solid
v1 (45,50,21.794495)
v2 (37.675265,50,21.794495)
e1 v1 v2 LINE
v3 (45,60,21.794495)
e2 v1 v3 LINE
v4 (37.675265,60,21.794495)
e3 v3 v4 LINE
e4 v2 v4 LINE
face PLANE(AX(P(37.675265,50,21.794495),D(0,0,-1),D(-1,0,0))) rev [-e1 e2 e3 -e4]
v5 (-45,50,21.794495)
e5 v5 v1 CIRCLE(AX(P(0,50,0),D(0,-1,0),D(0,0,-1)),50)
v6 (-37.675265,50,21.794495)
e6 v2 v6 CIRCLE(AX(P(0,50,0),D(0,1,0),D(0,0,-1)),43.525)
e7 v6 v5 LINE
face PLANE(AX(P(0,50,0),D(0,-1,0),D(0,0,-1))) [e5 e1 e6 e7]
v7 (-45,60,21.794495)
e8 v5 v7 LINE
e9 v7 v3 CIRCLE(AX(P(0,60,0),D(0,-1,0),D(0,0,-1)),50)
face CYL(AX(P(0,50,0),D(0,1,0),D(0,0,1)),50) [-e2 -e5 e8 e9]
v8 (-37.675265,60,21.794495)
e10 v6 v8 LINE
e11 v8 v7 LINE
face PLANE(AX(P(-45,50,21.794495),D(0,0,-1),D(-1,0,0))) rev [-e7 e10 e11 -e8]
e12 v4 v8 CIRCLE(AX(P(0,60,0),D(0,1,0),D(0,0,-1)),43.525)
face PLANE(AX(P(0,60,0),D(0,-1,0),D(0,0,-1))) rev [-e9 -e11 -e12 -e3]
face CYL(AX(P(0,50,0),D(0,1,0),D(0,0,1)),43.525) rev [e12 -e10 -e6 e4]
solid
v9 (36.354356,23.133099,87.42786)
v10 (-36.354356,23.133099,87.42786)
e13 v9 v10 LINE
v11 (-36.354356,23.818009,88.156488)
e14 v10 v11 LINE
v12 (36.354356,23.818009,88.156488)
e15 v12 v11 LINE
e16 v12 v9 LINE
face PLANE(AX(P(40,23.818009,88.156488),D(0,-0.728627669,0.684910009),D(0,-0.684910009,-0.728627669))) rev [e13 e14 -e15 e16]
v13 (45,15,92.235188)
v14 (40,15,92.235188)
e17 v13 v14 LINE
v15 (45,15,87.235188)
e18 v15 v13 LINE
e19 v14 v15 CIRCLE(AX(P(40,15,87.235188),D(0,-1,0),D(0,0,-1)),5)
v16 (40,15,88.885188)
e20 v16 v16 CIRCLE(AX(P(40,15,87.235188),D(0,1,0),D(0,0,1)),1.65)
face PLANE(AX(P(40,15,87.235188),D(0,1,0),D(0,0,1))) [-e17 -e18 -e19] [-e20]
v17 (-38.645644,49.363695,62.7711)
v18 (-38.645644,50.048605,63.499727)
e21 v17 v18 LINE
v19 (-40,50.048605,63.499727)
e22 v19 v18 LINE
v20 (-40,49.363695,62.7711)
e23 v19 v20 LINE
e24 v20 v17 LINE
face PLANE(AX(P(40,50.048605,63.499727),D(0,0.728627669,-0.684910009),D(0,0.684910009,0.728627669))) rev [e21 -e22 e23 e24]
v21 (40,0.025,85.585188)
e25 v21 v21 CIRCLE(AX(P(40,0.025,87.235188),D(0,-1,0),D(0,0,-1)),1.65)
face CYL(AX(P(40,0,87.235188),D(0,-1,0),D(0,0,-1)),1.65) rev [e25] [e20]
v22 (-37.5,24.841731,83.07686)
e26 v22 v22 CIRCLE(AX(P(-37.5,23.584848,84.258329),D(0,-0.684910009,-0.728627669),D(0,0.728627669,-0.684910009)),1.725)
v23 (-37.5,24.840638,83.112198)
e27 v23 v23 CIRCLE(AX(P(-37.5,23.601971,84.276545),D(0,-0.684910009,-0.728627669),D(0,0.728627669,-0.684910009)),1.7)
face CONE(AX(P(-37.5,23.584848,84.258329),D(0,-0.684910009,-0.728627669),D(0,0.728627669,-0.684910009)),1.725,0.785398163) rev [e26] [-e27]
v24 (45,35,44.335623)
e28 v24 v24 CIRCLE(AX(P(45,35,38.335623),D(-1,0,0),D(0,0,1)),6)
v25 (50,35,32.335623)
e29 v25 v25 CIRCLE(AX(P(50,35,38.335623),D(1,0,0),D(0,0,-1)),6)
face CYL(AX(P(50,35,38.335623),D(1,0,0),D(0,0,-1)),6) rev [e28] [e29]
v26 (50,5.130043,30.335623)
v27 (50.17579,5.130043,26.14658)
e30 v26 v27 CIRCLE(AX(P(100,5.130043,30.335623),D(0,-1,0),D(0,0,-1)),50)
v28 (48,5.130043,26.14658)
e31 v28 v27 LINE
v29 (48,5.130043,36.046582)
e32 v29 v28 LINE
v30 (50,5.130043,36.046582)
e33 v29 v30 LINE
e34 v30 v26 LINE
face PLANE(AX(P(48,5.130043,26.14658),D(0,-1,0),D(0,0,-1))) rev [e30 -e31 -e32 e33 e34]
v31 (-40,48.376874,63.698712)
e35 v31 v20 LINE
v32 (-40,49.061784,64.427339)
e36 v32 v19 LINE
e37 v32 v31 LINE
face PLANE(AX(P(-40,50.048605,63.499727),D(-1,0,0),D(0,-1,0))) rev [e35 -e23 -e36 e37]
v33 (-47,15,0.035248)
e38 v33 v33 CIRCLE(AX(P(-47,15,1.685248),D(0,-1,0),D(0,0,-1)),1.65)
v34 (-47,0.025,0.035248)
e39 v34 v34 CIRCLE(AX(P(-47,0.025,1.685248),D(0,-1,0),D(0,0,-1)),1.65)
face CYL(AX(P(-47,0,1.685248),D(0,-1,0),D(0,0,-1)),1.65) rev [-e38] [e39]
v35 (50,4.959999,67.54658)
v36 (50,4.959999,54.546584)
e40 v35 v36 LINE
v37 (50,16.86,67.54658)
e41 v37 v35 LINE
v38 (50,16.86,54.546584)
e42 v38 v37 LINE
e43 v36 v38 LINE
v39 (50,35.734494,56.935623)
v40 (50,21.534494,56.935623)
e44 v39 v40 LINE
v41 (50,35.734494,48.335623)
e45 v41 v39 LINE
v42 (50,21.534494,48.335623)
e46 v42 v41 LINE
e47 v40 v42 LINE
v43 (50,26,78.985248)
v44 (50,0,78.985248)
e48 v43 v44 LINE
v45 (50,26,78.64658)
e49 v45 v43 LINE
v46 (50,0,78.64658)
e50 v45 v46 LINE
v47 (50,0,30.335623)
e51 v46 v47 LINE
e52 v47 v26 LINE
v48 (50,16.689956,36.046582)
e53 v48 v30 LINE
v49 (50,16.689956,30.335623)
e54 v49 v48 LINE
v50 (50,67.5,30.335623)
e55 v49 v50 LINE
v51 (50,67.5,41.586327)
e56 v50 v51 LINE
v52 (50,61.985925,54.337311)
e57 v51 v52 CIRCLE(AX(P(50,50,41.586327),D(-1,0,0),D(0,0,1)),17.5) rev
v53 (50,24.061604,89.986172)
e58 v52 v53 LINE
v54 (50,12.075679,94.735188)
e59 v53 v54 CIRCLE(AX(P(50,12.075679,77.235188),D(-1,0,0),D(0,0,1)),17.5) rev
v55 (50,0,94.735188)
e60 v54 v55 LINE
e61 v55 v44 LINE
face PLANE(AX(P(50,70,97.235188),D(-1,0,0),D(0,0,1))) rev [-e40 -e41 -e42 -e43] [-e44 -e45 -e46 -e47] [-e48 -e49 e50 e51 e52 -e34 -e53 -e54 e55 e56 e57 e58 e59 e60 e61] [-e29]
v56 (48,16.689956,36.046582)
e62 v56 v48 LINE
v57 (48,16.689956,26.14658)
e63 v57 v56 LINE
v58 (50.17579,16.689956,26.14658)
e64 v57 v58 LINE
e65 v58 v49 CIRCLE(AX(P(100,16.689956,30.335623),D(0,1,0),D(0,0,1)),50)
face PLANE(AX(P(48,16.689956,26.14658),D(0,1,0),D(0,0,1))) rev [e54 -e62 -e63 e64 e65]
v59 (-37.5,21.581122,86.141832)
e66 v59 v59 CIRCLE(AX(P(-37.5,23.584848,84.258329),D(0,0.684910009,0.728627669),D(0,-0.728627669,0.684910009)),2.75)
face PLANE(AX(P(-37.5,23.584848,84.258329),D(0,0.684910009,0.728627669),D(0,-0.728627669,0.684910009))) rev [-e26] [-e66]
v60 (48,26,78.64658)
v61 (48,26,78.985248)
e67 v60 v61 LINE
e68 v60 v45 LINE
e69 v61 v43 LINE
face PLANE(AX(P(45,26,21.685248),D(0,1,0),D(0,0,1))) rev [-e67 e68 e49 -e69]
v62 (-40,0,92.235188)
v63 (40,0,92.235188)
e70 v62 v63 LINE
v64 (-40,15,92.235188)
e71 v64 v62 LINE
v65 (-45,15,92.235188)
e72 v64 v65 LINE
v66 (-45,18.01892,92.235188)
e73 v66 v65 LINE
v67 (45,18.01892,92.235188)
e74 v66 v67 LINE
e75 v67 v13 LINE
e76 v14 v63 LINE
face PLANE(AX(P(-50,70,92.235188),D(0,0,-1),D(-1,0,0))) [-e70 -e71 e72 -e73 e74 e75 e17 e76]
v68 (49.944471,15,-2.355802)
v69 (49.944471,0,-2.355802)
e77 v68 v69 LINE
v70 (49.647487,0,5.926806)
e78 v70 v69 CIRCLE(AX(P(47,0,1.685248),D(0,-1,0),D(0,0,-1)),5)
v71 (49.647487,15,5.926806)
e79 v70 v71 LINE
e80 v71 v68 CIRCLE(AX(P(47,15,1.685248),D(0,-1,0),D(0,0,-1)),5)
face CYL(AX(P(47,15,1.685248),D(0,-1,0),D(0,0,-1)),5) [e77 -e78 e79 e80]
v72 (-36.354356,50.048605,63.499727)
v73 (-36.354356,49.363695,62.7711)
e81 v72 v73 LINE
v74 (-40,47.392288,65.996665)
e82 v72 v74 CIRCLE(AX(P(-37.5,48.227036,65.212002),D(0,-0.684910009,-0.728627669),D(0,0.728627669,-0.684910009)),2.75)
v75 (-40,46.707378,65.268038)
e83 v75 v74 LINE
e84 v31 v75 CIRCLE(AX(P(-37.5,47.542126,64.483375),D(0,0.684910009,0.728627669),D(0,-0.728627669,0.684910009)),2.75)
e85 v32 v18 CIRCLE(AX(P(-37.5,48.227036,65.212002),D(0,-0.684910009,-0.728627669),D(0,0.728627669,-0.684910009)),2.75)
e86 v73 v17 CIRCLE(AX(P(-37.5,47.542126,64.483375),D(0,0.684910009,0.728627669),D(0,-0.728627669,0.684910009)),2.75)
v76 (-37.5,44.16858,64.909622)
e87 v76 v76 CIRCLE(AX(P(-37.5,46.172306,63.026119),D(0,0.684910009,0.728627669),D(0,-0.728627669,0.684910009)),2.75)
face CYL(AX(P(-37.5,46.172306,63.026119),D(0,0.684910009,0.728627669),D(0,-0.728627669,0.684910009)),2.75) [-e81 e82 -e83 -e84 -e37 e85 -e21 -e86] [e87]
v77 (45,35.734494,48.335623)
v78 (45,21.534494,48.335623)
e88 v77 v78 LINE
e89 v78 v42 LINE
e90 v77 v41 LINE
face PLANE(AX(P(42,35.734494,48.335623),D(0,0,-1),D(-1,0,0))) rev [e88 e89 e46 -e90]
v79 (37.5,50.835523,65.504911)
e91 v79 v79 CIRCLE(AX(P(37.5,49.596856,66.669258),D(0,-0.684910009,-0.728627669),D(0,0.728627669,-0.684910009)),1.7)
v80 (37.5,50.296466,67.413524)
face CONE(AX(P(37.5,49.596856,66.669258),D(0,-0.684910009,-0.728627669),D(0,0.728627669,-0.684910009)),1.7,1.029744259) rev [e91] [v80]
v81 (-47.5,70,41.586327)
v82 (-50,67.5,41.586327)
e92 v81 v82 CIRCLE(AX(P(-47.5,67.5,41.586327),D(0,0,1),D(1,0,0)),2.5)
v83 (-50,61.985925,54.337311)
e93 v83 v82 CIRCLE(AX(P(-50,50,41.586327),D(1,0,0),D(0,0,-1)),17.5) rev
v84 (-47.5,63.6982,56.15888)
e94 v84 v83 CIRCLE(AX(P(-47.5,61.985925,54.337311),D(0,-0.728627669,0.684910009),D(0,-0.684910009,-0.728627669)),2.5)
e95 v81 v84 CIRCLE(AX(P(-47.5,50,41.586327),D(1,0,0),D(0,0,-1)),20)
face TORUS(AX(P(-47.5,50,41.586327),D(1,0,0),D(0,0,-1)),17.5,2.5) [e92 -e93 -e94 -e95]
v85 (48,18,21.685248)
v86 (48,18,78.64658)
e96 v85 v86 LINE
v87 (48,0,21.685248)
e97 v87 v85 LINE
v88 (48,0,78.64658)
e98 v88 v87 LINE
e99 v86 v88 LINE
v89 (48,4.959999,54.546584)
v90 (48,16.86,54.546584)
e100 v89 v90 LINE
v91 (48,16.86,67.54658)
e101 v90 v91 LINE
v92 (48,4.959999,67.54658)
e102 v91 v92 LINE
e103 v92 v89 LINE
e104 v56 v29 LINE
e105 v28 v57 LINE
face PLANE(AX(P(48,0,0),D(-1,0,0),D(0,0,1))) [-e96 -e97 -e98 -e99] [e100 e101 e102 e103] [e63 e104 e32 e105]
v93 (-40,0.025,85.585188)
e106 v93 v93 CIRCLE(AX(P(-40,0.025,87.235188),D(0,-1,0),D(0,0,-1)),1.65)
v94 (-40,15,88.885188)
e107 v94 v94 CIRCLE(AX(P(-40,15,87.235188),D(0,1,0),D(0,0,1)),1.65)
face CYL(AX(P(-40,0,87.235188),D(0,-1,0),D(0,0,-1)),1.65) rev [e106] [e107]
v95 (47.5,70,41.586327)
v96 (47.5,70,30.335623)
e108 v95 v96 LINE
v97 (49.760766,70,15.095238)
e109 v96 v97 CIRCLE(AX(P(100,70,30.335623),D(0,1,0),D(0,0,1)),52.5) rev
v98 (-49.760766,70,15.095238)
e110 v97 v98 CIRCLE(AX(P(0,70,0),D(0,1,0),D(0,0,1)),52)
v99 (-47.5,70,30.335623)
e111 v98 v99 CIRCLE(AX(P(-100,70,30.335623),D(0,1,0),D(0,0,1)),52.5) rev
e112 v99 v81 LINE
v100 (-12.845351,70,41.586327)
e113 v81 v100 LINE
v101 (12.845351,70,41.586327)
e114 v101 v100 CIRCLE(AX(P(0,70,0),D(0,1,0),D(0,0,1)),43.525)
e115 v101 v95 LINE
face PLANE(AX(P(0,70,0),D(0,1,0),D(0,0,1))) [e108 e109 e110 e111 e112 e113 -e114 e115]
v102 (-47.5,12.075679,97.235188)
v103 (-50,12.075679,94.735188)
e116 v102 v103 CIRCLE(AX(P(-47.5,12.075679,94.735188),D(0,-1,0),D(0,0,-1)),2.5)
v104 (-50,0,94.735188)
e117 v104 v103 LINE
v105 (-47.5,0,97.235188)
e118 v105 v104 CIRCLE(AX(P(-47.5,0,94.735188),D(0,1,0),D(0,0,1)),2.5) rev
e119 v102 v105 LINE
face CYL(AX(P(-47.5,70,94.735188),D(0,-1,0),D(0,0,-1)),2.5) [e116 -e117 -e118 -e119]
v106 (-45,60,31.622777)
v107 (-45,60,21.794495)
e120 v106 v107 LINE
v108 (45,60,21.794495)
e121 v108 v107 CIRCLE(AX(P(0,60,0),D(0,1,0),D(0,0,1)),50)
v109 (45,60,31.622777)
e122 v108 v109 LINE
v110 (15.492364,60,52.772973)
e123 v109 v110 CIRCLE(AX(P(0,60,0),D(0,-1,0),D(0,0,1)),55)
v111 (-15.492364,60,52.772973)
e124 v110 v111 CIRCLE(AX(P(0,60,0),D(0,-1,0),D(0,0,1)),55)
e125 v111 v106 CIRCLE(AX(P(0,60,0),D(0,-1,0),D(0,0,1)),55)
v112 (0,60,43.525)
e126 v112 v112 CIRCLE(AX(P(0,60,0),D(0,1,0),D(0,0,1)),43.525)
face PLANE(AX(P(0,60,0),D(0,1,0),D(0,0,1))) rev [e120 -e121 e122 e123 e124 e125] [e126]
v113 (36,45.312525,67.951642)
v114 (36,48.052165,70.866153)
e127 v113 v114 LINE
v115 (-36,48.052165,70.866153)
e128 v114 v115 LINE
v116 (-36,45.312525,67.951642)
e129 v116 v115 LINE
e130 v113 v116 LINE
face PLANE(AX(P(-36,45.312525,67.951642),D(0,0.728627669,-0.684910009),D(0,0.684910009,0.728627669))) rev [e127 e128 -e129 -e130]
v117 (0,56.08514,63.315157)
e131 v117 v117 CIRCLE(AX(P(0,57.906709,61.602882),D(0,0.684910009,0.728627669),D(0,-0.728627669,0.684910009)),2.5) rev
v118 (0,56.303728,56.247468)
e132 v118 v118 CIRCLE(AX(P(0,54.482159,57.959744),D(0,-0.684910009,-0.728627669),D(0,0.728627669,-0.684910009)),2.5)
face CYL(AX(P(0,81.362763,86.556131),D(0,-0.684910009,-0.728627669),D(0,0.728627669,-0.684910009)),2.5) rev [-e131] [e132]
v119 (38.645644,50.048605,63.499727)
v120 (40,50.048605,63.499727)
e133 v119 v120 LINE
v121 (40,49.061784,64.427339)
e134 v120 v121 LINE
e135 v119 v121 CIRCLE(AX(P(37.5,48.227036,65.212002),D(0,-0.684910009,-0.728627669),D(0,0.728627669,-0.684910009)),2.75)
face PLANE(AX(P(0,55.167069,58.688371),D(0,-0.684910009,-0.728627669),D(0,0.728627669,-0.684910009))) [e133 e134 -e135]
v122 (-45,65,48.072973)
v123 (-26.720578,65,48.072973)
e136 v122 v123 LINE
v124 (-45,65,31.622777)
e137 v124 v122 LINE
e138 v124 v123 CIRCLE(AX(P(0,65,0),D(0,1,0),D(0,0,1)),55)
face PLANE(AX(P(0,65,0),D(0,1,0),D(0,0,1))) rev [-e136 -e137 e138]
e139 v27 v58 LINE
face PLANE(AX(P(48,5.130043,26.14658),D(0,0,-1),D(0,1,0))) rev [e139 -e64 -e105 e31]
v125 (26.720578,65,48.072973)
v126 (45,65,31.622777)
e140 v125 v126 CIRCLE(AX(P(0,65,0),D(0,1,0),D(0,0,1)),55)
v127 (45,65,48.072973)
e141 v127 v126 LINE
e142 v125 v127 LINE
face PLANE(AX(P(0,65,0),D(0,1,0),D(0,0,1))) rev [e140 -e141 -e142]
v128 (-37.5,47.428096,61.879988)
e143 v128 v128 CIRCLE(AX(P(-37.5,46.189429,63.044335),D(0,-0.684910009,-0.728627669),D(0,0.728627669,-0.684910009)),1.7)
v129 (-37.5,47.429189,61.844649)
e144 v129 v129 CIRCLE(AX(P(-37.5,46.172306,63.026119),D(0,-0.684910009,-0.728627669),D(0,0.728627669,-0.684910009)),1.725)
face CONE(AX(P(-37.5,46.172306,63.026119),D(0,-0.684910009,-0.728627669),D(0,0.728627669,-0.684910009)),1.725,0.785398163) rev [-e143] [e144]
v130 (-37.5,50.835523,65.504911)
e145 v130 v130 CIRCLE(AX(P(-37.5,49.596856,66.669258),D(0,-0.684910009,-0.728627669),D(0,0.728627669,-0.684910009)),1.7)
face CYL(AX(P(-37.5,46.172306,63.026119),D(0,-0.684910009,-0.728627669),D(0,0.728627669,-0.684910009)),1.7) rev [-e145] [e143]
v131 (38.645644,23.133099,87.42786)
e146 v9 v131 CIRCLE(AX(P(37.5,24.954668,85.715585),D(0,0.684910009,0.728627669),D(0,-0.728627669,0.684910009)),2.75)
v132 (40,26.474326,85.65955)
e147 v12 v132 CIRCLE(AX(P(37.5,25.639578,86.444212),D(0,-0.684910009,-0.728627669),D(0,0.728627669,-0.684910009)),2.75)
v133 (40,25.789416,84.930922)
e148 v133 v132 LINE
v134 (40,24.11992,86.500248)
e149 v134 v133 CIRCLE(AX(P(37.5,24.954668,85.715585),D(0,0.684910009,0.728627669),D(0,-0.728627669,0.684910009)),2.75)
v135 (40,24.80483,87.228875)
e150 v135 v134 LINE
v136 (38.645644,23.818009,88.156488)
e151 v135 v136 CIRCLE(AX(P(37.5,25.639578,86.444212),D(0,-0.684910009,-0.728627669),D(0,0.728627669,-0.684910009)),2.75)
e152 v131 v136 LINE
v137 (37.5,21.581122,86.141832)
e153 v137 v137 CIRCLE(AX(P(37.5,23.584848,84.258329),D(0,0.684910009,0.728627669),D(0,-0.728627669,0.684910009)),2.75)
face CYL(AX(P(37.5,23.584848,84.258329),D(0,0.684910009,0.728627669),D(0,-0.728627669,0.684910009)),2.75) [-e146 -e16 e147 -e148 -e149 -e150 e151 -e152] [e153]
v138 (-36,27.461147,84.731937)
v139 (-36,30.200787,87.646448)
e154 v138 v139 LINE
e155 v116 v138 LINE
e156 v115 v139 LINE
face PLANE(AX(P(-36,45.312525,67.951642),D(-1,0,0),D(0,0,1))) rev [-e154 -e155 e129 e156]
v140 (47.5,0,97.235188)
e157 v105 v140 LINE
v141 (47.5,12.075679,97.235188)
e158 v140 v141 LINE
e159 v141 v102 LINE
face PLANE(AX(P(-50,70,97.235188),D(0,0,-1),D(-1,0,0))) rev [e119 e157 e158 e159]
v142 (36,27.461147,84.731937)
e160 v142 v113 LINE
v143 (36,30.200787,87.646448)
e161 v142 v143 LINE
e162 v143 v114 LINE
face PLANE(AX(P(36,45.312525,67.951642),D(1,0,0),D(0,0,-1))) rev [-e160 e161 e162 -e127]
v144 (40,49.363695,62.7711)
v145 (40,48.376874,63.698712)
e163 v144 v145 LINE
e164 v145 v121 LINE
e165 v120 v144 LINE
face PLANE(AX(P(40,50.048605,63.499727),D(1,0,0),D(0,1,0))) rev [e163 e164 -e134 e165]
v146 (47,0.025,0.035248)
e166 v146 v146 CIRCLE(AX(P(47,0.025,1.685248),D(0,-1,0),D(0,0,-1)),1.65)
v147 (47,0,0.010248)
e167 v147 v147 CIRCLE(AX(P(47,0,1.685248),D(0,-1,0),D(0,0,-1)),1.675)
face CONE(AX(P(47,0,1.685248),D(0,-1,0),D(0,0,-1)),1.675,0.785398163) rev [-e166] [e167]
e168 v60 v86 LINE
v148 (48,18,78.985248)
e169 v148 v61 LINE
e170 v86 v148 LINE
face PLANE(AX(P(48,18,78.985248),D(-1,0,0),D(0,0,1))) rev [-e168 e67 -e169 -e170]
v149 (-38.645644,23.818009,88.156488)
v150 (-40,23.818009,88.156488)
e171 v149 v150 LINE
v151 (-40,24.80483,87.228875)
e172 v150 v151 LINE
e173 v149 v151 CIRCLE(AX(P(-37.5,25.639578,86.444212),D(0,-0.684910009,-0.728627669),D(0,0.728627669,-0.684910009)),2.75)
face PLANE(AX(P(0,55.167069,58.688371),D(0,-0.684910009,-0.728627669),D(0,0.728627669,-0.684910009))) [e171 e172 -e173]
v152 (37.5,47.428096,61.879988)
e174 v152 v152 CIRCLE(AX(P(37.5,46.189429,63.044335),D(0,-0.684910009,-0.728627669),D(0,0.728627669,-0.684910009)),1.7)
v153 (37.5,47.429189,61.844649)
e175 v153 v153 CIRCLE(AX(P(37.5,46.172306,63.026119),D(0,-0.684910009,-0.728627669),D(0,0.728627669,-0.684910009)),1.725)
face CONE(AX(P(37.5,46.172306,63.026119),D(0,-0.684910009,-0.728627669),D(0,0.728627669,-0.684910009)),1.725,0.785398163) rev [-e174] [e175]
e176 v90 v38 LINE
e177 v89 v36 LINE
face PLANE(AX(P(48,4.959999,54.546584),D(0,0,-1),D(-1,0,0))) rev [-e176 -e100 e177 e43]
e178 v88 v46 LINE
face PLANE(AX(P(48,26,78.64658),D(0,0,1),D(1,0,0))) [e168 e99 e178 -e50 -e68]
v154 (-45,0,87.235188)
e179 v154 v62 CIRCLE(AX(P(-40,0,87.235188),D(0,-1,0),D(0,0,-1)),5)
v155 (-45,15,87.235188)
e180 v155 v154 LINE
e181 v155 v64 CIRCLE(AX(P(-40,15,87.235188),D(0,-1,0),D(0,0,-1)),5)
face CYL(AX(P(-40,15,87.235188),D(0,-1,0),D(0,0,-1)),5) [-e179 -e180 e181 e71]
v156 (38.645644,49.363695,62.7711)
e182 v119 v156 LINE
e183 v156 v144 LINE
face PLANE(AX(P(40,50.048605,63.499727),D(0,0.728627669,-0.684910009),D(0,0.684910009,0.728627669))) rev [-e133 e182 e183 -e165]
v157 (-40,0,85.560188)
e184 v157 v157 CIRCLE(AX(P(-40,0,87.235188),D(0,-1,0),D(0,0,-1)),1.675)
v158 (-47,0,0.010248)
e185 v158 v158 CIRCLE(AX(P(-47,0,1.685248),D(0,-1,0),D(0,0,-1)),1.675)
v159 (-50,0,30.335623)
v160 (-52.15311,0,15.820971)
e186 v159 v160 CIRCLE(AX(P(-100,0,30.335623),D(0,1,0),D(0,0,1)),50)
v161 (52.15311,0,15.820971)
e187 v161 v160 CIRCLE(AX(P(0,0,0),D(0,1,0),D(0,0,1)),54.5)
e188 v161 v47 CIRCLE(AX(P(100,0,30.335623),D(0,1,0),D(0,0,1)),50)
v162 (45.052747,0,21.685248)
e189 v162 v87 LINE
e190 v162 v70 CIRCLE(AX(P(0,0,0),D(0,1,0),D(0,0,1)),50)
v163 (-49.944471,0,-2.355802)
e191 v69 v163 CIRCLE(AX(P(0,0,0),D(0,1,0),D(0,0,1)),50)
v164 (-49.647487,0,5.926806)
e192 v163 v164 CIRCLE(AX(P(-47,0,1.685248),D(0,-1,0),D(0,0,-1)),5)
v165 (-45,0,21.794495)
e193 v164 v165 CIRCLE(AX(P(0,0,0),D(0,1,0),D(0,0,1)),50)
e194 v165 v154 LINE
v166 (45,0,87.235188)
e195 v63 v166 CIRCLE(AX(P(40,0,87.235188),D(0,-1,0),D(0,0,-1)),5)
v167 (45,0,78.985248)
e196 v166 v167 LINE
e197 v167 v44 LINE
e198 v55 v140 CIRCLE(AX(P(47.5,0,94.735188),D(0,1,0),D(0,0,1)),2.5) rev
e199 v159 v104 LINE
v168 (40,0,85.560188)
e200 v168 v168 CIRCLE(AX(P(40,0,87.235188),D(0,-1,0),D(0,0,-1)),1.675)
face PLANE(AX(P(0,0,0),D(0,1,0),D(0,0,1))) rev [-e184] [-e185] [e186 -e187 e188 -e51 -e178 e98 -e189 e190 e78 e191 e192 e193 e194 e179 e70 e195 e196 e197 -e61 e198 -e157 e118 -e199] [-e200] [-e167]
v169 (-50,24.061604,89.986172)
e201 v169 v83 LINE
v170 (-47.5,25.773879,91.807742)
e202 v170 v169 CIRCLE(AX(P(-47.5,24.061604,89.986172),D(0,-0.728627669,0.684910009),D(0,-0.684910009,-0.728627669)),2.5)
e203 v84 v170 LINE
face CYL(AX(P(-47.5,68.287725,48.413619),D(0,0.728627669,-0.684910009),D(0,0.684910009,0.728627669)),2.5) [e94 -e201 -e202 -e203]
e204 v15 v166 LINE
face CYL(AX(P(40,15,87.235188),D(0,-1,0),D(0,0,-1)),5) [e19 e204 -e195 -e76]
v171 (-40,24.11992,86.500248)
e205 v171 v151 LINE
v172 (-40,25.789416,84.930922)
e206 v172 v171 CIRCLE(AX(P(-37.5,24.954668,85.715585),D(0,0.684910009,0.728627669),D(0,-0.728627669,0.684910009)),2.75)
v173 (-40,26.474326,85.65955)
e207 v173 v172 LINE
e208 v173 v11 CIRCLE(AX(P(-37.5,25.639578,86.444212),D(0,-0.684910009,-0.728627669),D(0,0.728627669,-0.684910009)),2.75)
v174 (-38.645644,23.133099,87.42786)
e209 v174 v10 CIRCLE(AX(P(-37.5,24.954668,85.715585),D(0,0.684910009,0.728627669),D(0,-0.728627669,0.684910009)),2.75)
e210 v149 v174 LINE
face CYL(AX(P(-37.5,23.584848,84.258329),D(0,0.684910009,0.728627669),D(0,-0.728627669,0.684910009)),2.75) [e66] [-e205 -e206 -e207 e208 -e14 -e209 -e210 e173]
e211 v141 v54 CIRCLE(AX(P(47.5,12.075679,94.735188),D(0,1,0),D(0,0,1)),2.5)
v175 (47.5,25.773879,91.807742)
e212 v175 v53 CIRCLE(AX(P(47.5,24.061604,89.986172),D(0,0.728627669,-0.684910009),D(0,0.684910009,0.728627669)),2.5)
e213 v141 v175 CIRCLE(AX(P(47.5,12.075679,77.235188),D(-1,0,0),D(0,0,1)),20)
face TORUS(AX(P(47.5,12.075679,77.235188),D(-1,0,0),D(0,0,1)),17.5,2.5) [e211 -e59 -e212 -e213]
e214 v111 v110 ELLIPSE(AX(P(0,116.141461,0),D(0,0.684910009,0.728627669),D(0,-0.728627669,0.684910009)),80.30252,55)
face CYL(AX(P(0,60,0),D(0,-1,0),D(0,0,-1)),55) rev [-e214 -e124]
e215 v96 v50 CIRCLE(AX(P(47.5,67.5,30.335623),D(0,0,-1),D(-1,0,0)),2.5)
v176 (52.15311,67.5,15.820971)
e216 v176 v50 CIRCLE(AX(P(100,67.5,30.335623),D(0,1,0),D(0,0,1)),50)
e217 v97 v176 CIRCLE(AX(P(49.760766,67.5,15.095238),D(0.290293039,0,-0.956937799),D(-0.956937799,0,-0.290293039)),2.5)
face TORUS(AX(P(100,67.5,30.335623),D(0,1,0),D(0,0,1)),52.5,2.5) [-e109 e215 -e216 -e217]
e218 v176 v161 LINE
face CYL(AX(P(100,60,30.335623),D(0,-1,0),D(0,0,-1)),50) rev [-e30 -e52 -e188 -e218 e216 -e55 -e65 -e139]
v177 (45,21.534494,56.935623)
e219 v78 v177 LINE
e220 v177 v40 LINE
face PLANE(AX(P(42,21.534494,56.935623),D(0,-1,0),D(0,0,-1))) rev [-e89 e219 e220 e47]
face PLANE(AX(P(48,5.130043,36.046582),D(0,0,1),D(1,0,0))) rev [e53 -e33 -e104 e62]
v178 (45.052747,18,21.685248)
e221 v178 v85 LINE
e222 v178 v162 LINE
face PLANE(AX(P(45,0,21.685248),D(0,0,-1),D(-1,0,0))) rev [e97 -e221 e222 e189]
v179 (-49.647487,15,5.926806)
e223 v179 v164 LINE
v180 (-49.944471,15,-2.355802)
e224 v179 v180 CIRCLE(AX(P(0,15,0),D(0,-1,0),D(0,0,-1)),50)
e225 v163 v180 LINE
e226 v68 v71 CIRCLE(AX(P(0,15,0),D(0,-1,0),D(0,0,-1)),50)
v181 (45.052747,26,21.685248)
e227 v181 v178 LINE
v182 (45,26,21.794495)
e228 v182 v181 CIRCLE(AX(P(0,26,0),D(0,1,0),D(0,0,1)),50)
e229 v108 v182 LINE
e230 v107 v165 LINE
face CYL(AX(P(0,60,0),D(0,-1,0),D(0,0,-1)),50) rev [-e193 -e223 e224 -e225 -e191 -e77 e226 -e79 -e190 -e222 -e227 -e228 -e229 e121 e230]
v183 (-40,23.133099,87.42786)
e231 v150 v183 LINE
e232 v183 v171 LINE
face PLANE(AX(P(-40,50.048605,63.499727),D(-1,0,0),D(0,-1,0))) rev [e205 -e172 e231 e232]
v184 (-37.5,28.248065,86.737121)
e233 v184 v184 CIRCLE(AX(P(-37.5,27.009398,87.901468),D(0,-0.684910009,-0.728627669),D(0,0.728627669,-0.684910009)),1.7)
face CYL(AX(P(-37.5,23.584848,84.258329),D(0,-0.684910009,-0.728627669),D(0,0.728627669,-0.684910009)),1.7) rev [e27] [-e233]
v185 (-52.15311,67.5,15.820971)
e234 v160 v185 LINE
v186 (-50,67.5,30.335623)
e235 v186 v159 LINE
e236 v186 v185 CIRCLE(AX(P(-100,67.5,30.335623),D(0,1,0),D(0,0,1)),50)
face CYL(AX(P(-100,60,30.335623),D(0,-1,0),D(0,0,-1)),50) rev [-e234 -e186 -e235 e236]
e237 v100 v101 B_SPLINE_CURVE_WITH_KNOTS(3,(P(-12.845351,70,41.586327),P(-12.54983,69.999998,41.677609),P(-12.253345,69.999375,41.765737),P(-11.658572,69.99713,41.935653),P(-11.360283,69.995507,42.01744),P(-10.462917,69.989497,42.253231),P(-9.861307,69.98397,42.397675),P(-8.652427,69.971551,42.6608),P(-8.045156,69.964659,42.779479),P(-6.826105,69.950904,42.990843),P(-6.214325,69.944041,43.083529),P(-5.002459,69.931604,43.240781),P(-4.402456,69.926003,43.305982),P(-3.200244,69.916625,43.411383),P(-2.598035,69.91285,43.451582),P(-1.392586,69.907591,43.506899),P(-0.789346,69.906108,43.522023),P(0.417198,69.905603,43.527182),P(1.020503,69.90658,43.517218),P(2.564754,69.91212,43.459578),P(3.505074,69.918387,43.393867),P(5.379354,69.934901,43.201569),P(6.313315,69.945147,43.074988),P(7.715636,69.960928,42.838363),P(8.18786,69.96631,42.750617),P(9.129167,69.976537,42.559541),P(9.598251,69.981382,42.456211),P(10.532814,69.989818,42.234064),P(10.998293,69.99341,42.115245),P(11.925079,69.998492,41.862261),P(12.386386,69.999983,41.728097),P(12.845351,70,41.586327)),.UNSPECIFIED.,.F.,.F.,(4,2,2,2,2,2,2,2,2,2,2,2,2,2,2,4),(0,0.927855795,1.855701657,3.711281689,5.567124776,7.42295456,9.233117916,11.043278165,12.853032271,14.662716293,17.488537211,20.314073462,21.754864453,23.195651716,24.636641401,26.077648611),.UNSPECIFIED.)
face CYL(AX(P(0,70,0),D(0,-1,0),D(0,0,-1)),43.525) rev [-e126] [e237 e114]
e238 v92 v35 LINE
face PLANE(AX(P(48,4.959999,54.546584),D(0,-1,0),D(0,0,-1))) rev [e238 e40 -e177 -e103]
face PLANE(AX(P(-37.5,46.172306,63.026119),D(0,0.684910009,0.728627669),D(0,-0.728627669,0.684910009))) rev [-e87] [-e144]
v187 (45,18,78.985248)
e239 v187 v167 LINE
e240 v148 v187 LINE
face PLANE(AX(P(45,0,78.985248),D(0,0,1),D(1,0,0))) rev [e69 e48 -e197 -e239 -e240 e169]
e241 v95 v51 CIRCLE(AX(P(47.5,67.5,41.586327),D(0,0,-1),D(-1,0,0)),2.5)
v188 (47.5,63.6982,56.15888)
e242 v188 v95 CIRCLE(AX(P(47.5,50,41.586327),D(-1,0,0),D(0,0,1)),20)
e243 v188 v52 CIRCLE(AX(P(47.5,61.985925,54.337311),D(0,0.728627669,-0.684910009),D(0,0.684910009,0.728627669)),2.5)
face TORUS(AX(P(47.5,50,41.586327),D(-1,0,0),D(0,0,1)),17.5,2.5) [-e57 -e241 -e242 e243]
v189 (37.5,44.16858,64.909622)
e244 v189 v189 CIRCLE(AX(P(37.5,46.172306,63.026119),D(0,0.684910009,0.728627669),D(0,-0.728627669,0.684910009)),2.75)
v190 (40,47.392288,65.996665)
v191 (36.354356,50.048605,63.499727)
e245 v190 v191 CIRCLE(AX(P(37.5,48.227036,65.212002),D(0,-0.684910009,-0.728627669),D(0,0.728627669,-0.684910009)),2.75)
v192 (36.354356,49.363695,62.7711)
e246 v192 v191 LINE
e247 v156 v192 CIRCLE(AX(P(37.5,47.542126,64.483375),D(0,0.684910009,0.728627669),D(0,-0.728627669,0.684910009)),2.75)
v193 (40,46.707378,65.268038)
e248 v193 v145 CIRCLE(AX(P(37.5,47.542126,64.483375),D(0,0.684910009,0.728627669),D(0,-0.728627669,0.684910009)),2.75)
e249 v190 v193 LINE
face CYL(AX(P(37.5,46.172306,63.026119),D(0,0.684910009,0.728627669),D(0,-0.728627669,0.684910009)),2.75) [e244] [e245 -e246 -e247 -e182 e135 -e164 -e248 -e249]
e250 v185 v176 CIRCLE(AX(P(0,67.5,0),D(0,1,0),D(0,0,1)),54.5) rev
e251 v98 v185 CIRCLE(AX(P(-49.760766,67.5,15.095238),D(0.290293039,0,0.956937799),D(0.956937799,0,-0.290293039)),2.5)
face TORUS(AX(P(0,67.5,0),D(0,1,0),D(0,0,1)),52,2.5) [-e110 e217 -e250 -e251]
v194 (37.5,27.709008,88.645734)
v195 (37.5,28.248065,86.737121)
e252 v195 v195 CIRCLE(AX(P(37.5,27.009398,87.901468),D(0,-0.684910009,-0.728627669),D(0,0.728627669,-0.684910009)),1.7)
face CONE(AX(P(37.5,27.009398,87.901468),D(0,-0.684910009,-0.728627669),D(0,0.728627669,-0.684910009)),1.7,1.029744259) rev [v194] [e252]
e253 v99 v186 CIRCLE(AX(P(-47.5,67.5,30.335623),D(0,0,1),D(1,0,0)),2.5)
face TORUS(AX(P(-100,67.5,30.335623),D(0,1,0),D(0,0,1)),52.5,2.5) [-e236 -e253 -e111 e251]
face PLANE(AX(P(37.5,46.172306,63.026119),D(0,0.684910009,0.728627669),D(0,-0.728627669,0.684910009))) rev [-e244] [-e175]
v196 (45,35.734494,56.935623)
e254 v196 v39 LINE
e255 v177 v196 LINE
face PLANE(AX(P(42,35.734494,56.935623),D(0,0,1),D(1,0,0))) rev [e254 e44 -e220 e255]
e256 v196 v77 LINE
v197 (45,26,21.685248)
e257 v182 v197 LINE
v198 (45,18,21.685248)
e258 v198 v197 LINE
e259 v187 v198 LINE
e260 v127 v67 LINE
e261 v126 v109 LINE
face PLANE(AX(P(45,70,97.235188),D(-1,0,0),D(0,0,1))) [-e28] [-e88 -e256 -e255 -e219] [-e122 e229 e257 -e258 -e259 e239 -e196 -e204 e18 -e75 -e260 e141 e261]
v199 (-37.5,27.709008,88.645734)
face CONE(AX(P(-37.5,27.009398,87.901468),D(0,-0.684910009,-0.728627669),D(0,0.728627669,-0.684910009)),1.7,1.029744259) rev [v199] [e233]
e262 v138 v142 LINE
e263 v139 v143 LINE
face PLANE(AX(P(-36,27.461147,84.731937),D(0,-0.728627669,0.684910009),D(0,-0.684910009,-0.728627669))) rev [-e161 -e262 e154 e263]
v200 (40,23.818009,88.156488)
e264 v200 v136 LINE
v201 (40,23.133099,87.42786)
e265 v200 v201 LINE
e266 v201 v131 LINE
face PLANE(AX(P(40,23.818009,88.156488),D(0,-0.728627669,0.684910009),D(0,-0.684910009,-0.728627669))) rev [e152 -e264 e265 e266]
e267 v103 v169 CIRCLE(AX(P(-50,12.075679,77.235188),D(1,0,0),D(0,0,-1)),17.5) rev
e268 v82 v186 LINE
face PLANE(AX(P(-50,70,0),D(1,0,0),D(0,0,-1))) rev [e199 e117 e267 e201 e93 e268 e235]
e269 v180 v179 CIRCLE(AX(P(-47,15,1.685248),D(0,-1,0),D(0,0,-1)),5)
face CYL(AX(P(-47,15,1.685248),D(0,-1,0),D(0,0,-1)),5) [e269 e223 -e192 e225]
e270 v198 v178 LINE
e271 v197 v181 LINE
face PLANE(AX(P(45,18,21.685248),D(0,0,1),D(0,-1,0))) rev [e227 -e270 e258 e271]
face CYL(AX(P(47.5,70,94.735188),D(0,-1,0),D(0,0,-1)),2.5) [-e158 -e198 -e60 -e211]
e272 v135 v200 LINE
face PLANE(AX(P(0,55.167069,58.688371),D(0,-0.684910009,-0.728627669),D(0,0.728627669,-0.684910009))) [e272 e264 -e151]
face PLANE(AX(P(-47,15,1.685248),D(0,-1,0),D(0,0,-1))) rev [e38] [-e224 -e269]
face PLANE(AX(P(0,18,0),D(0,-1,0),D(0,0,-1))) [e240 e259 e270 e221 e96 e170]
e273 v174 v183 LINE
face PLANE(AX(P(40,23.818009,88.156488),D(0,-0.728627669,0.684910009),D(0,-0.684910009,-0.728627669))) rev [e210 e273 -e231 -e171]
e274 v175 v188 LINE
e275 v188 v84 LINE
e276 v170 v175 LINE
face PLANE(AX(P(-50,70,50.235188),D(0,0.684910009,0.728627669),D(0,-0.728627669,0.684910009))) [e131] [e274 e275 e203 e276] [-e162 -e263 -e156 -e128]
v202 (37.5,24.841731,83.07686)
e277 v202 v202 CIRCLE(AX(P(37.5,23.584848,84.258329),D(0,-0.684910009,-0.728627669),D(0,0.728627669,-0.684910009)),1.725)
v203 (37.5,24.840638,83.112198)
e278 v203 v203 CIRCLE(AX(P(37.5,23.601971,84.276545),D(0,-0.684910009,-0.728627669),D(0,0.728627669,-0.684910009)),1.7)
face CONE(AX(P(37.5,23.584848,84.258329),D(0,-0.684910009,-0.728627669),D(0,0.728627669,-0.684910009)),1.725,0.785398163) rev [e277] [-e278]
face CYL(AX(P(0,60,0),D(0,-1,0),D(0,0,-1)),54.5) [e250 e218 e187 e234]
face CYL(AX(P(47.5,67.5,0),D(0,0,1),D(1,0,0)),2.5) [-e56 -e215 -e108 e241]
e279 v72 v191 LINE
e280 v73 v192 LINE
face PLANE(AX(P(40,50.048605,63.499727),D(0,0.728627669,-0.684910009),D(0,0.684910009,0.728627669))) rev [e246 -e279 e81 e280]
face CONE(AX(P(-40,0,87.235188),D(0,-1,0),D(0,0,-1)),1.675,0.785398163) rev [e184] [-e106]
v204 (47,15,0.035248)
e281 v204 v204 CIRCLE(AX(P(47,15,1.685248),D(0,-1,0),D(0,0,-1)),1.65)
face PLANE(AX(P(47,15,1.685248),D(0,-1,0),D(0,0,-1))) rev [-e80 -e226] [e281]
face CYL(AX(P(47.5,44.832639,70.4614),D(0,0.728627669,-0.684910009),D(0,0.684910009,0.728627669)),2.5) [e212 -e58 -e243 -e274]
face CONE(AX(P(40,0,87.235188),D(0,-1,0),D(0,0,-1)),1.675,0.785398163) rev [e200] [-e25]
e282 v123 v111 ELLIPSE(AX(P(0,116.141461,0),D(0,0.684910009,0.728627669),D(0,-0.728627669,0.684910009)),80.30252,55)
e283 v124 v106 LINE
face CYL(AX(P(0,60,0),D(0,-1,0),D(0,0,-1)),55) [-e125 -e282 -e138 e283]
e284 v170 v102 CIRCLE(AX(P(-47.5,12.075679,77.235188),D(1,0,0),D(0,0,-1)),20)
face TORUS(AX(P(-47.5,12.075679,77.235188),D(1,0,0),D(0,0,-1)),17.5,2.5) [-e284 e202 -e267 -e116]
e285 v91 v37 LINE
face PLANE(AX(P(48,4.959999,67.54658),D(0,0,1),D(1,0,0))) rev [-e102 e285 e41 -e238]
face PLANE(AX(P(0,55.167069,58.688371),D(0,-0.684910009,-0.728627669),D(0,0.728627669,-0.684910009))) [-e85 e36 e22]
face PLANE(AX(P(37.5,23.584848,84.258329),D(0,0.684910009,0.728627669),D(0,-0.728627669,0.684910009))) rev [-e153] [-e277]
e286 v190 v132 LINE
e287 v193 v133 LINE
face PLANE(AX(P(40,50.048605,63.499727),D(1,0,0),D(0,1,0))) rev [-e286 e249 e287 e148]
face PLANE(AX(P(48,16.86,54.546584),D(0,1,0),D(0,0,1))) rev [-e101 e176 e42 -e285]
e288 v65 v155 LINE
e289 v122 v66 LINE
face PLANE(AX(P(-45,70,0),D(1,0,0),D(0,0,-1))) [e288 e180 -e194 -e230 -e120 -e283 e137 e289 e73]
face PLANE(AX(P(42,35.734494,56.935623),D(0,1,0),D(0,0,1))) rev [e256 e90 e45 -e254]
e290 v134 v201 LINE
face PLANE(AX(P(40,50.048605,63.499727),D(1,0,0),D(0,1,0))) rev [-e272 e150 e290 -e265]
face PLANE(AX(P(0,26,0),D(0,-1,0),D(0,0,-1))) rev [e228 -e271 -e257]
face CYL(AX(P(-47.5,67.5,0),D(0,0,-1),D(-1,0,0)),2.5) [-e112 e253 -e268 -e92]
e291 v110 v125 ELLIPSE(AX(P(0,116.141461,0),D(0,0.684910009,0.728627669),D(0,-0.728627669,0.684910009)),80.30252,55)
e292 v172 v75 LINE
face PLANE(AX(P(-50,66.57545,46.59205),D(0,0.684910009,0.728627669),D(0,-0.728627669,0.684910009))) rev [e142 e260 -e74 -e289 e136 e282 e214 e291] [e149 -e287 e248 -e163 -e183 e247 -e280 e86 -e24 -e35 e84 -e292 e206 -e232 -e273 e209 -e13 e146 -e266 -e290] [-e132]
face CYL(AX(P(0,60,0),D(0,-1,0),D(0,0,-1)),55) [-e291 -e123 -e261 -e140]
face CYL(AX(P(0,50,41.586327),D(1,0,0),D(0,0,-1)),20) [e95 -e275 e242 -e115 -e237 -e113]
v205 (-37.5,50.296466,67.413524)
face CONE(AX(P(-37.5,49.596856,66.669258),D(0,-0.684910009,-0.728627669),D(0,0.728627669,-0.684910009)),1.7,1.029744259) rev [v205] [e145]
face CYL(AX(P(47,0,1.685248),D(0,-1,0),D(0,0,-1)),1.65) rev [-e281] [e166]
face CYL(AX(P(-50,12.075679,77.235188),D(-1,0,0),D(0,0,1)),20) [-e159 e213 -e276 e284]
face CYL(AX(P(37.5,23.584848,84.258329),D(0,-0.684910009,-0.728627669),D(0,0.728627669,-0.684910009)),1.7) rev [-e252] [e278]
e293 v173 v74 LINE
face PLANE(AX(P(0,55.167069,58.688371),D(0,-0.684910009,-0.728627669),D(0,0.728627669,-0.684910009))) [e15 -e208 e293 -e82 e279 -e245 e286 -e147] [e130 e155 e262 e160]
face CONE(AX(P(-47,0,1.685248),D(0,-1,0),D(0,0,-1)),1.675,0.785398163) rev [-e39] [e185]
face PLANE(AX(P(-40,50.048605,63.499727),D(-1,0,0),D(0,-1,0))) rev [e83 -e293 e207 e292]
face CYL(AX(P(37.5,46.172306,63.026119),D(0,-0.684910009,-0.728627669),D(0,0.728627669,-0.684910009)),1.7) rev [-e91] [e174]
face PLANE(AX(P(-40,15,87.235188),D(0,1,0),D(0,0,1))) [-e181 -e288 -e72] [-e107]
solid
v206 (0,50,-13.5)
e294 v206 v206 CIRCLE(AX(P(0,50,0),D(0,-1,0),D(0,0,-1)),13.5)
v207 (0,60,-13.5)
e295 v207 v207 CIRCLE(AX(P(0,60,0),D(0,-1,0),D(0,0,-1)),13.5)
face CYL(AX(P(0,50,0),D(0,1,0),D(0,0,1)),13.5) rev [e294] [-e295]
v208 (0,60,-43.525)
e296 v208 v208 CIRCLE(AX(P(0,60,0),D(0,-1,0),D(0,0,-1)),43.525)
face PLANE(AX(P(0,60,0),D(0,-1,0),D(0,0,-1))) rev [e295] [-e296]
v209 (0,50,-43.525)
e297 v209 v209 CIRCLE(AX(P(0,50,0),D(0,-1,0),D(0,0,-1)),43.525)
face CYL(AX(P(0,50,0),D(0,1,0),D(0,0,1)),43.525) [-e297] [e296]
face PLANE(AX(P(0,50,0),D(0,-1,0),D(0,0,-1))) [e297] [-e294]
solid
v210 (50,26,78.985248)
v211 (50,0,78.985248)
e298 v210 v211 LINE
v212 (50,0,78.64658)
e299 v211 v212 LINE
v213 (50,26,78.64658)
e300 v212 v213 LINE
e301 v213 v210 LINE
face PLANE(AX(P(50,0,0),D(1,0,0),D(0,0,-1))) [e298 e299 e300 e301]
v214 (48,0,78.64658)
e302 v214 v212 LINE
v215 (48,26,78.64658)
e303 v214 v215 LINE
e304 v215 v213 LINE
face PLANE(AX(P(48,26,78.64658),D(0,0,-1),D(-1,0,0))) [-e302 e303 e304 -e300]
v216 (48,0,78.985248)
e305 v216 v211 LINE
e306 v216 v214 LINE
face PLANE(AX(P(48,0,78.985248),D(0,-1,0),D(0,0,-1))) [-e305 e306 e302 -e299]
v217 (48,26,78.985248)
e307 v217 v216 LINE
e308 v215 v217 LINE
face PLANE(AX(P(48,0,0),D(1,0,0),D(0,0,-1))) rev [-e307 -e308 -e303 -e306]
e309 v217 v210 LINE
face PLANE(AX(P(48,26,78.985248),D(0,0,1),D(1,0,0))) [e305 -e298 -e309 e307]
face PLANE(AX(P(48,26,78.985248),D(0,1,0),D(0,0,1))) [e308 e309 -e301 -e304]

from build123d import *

# Parameters (mm, degrees)
SKETCH1_R                             = 54.5
SKETCH1_R_2                           = 50
BOSS_EXTRUDE1_DEPTH                   = 60
SKETCH2_R                             = 54.5
SKETCH2_R_2                           = 43.525
BOSS_EXTRUDE2_DEPTH                   = 10
BOSS_EXTRUDE4_DEPTH                   = 70
CUT_EXTRUDE3_DEPTH                    = 100
SHELL1_DEPTH                          = 65
SHELL1_START                          = 79.546448744
SHELL1_2_OUTLINE_W                    = 92
SHELL1_2_OUTLINE_H                    = 68
SHELL1_2_DEPTH                        = 5
CUT_EXTRUDE4_DEPTH                    = 60
SKETCH12_W                            = 72
SKETCH12_H                            = 24.5
CUT_EXTRUDE5_DEPTH                    = 4
SKETCH13_W                            = 80
SKETCH13_H                            = 36
CUT_EXTRUDE6_DEPTH                    = 1
SKETCH15_R                            = 2.75
BOSS_EXTRUDE5_DEPTH                   = 7
M3_CLEARANCE_HOLE1_D                  = 3.4
M3_CLEARANCE_HOLE1_DEPTH              = 5
M3_CLEARANCE_HOLE1_CSINK_D            = 3.45
M3_CLEARANCE_HOLE1_CSINK_ANGLE        = 90
M3_CLEARANCE_HOLE1_TIP                = 1.021463052
SKETCH19_R                            = 5
BOSS_EXTRUDE6_DEPTH                   = 15
BOSS_EXTRUDE6_2_DEPTH                 = 15
BOSS_EXTRUDE7_DEPTH                   = 15
SKETCH21_R                            = 5
BOSS_EXTRUDE8_DEPTH                   = 15
TAP_DRILL_FOR_M4X0_7_TAP1_D           = 3.3
TAP_DRILL_FOR_M4X0_7_TAP1_DEPTH       = 15
TAP_DRILL_FOR_M4X0_7_TAP1_CSINK_D     = 3.35
TAP_DRILL_FOR_M4X0_7_TAP1_CSINK_ANGLE = 90
SKETCH24_W                            = 57.3
SKETCH24_H                            = 26
CUT_EXTRUDE7_DEPTH                    = 5
SKETCH25_W                            = 57.3
SKETCH25_H                            = 26
SKETCH25_W_2                          = 12.999996543
SKETCH25_H_2                          = 11.900000274
SKETCH25_W_3                          = 9.900001809
SKETCH25_H_3                          = 11.55991244
BOSS_EXTRUDE9_DEPTH                   = 2
SKETCH26_W                            = 0.338668116
SKETCH26_H                            = 26
BOSS_EXTRUDE10_DEPTH                  = 2
FILLET1_R                             = 50
FILLET2_R                             = 20
FILLET3_R                             = 20
FILLET4_R                             = 2.5
SKETCH27_R                            = 2.5
CUT_EXTRUDE8_DEPTH                    = 5
SKETCH30_W                            = 6
SKETCH30_H                            = 5.001
SKETCH31_R                            = 43.525
SKETCH31_R_2                          = 13.5
BOSS_EXTRUDE11_DEPTH                  = 10
BOSS_EXTRUDE16_DEPTH                  = 10
SKETCH36_W                            = 3
SKETCH36_H                            = 57.3
BOSS_EXTRUDE17_DEPTH                  = 8
SKETCH33_W                            = 8.6
SKETCH33_H                            = 14.2
CUT_EXTRUDE10_DEPTH                   = 8


with BuildPart() as part:
    # Sketch1 → Boss-Extrude1 (new body)
    with BuildSketch(Plane(origin=(0, 0, 0), x_dir=(1, 0, 0), z_dir=(0, 1, 0))):
        with Locations(Location((0, 0, 0), (0, 0, 270))):
            Circle(SKETCH1_R)
        with Locations(Location((0, 0, 0), (0, 0, 270))):
            Circle(SKETCH1_R_2, mode=Mode.SUBTRACT)
    extrude(amount=BOSS_EXTRUDE1_DEPTH)

    # Sketch2 → Boss-Extrude2 (add)
    with BuildSketch(Plane(origin=(0, 60, 0), x_dir=(1, 0, 0), z_dir=(0, 1, 0))):
        with Locations(Location((0, 0, 0), (0, 0, 270))):
            Circle(SKETCH2_R)
        with Locations(Location((0, 0, 0), (0, 0, 270))):
            Circle(SKETCH2_R_2, mode=Mode.SUBTRACT)
    extrude(amount=BOSS_EXTRUDE2_DEPTH)

    # Sketch3 → Boss-Extrude4 (add)
    with BuildSketch(Plane.XZ):
        with BuildLine():
            Line((-50, 0), (-50, 97.235188276))
            Line((-50, 97.235188276), (50, 97.235188276))
            Line((50, 97.235188276), (50, 0))
            ThreePointArc((50, 0), (0, 50), (-50, 0))
        make_face()
    extrude(amount=-BOSS_EXTRUDE4_DEPTH)

    # Sketch4 → Cut-Extrude3 (cut)
    with BuildSketch(Plane(origin=(50, 0, 0), x_dir=(0, 0, -1), z_dir=(1, 0, 0))):
        Polygon((-97.235188276, 70), (-97.235188276, 20), (-50.235188276, 70), align=None)
    extrude(amount=-CUT_EXTRUDE3_DEPTH, mode=Mode.SUBTRACT)

    # Shell1: read off the stored shape, not the designer's step
    # Shell1 outline → Shell1 (cut)
    with BuildSketch(Plane(origin=(0, 0, 0), x_dir=(1, 0, 0), z_dir=(0, 1, 0))):
        with BuildLine():
            Line((45, -92.235188276), (45, -31.622776602))
            ThreePointArc((45, -31.622776602), (0, -55), (-45, -31.622776602))
            Line((-45, -31.622776602), (-45, -92.235188276))
            Line((-45, -92.235188276), (45, -92.235188276))
        make_face()
    extrude(amount=SHELL1_DEPTH, mode=Mode.SUBTRACT)

    # Shell1 2 outline → Shell1 2 (add)
    with BuildSketch(Plane(origin=(0, 0, 0), x_dir=(1, 0, 0), z_dir=(0, 0.6849100087678871, 0.7286276689020071)).offset(SHELL1_START)):
        with Locations((0, -18)):
            Rectangle(SHELL1_2_OUTLINE_W, SHELL1_2_OUTLINE_H)
    extrude(amount=SHELL1_2_DEPTH)

    # Sketch5 → Cut-Extrude4 (cut)
    with BuildSketch(Plane.XZ):
        with BuildLine():
            Line((-45, 31.622776602), (-45, 21.794494718))
            ThreePointArc((-45, 21.794494718), (0, 50), (45, 21.794494718))
            Line((45, 21.794494718), (45, 31.622776602))
            ThreePointArc((45, 31.622776602), (0, 55), (-45, 31.622776602))
        make_face()
    extrude(amount=-CUT_EXTRUDE4_DEPTH, mode=Mode.SUBTRACT)

    # Sketch12 → Cut-Extrude5 (cut)
    with BuildSketch(Plane(origin=(0, 57.906708951, 61.602881862), x_dir=(1, 0, 0), z_dir=(0, 0.6849100087678871, 0.7286276689020071))):
        with Locations((0, -25.774800277)):
            Rectangle(SKETCH12_W, SKETCH12_H)
    extrude(amount=-CUT_EXTRUDE5_DEPTH, mode=Mode.SUBTRACT)

    # Sketch13 → Cut-Extrude6 (cut)
    with BuildSketch(Plane(origin=(0, 54.482158907, 57.959743518), x_dir=(-1, 0, 0), z_dir=(0, -0.6849100087678871, -0.7286276689020071))):
        with Locations((0, -25.024800277)):
            Rectangle(SKETCH13_W, SKETCH13_H)
    extrude(amount=-CUT_EXTRUDE6_DEPTH, mode=Mode.SUBTRACT)

    # Sketch15 → Boss-Extrude5 (add)
    with BuildSketch(Plane(origin=(0, 57.906708951, 61.602881862), x_dir=(1, 0, 0), z_dir=(0, 0.6849100087678871, 0.7286276689020071))):
        with Locations(Location((-37.5, -9.524800277, 0), (0, 0, 270))):
            Circle(SKETCH15_R)
        with Locations(Location((37.5, -9.524800277, 0), (0, 0, 270))):
            Circle(SKETCH15_R)
        with Locations(Location((-37.5, -40.524800277, 0), (0, 0, 270))):
            Circle(SKETCH15_R)
        with Locations(Location((37.5, -40.524800277, 0), (0, 0, 270))):
            Circle(SKETCH15_R)
    extrude(amount=-BOSS_EXTRUDE5_DEPTH)

    # M3 Clearance Hole1
    with Locations(Plane(origin=(0, 53.112338889, 56.50248818), x_dir=(-1, 0, 0), z_dir=(0, -0.6849100087678871, -0.728627668902007))):
        with Locations((-37.5, -9.524800277), (37.5, -9.524800277), (37.5, -40.524800277), (-37.5, -40.524800277)):
            CounterSinkHole(M3_CLEARANCE_HOLE1_D / 2, M3_CLEARANCE_HOLE1_CSINK_D / 2, depth=M3_CLEARANCE_HOLE1_DEPTH, counter_sink_angle=M3_CLEARANCE_HOLE1_CSINK_ANGLE)
            with Locations((0, 0, -(M3_CLEARANCE_HOLE1_DEPTH + M3_CLEARANCE_HOLE1_TIP / 2))):  # 118° drill point
                Cone(0, M3_CLEARANCE_HOLE1_D / 2, M3_CLEARANCE_HOLE1_TIP, mode=Mode.SUBTRACT)



with BuildPart() as body_2:
    # Sketch19 → Boss-Extrude6 (new body)
    with BuildSketch(Plane(origin=(0, 0, 0), x_dir=(-1, 0, 0), z_dir=(0, -1, 0))):
        with Locations(Location((40, -87.235188276, 0), (0, 0, 90))):
            Circle(SKETCH19_R)
    extrude(amount=-BOSS_EXTRUDE6_DEPTH)


with BuildPart() as body_3:
    # Sketch19 → Boss-Extrude6 2 (new body)
    with BuildSketch(Plane(origin=(0, 0, 0), x_dir=(-1, 0, 0), z_dir=(0, -1, 0))):
        with Locations(Location((-40, -87.235188276, 0), (0, 0, 90))):
            Circle(SKETCH19_R)
    extrude(amount=-BOSS_EXTRUDE6_2_DEPTH)


with BuildPart() as part_1:
    add(part.part)

    add(body_2.part)  # Boss-Extrude7 merges body 2

    add(body_3.part)  # Boss-Extrude7 merges body 3
    # Sketch20 → Boss-Extrude7 (add)
    with BuildSketch(Plane.XZ):
        with BuildLine():
            Line((-40, 92.235188276), (-45, 92.235188276))
            Line((-45, 92.235188276), (-45, 87.235188276))
            ThreePointArc((-45, 87.235188276), (-43.535533906, 90.770722182), (-40, 92.235188276))
        make_face()
        with BuildLine():
            Line((40, 92.235188276), (45, 92.235188276))
            Line((45, 92.235188276), (45, 87.235188276))
            ThreePointArc((45, 87.235188276), (43.535533906, 90.770722182), (40, 92.235188276))
        make_face()
    extrude(amount=-BOSS_EXTRUDE7_DEPTH)

    # Sketch21 → Boss-Extrude8 (add)
    with BuildSketch(Plane.XZ):
        with Locations((47, 1.685248442)):
            Circle(SKETCH21_R)
        with Locations((-47, 1.685248442)):
            Circle(SKETCH21_R)
    extrude(amount=-BOSS_EXTRUDE8_DEPTH)

    # Tap Drill for M4x0.7 Tap1
    with Locations(Plane(origin=(-47, 0, 1.685248442), x_dir=(0, 0, -1), z_dir=(0, -1, 0))):
        with Locations((0, 0), (0, 94), (-85.549939834, 87), (-85.549939834, 7)):
            CounterSinkHole(TAP_DRILL_FOR_M4X0_7_TAP1_D / 2, TAP_DRILL_FOR_M4X0_7_TAP1_CSINK_D / 2, depth=TAP_DRILL_FOR_M4X0_7_TAP1_DEPTH, counter_sink_angle=TAP_DRILL_FOR_M4X0_7_TAP1_CSINK_ANGLE)

    # Sketch24 → Cut-Extrude7 (cut)
    with BuildSketch(Plane(origin=(50, 0, 0), x_dir=(0, 0, -1), z_dir=(1, 0, 0))):
        with Locations((-50.335248442, 13)):
            Rectangle(SKETCH24_W, SKETCH24_H)
    extrude(amount=-CUT_EXTRUDE7_DEPTH, mode=Mode.SUBTRACT)

    # Sketch25 → Boss-Extrude9 (add)
    with BuildSketch(Plane(origin=(50, 0, 50), x_dir=(0, 0, 1), z_dir=(1, 0, 0))):
        with Locations((-0.003419674, -13)):
            Rectangle(SKETCH25_W, SKETCH25_H)
        with Locations((11.046582054, -10.90999946)):
            Rectangle(SKETCH25_W_2, SKETCH25_H_2, mode=Mode.SUBTRACT)
        with Locations((-18.903418769, -10.90999946)):
            Rectangle(SKETCH25_W_3, SKETCH25_H_3, mode=Mode.SUBTRACT)
    extrude(amount=-BOSS_EXTRUDE9_DEPTH)

    # Fillet1
    # the kernel refuses this fillet: 50 mm, written as the material it adds along each edge
    with BuildSketch(Plane(origin=(50, 70, 21.685248442), x_dir=(0, 0, 1), z_dir=(0, -1, 0))) as fillet1_piece_1_section:
        with BuildLine():
            CenterArc((8.650374182, -50), FILLET1_R, 90, 16.875500679)
            ThreePointArc((-5.864277791, -2.153110048), (-2.901263551, -1.160648077), (0, 0))
            Line((0, 0), (8.650374182, 0))
        make_face()
    fillet1_piece_1 = extrude(amount=70, mode=Mode.PRIVATE)
    fillet1_piece_1 = split(fillet1_piece_1, bisect_by=Plane(origin=(50, 70, 26.146580326), z_dir=(0, 0, 1)), keep=Keep.TOP, mode=Mode.PRIVATE)
    fillet1_piece_1 = split(fillet1_piece_1, bisect_by=Plane(origin=(50, 16.68995568, 21.685248442), z_dir=(0, 1, 0)), keep=Keep.TOP, mode=Mode.PRIVATE)
    add(fillet1_piece_1)
    with BuildSketch(Plane(origin=(50, 70, 21.685248442), x_dir=(0, 0, 1), z_dir=(0, -1, 0))) as fillet1_piece_2_section:
        with BuildLine():
            CenterArc((8.650374182, -50), FILLET1_R, 90, 16.875500679)
            ThreePointArc((-5.864277791, -2.153110048), (-2.901263551, -1.160648077), (0, 0))
            Line((0, 0), (8.650374182, 0))
        make_face()
    fillet1_piece_2 = extrude(amount=70, mode=Mode.PRIVATE)
    fillet1_piece_2 = split(fillet1_piece_2, bisect_by=Plane(origin=(50, 70, 26.146580326), z_dir=(0, 0, -1)), keep=Keep.TOP, mode=Mode.PRIVATE)
    fillet1_piece_2 = split(fillet1_piece_2, bisect_by=Plane(origin=(50, 16.68995568, 21.685248442), z_dir=(0, 1, 0)), keep=Keep.TOP, mode=Mode.PRIVATE)
    add(fillet1_piece_2)
    with BuildSketch(Plane(origin=(50, 70, 21.685248442), x_dir=(0, 0, 1), z_dir=(0, -1, 0))) as fillet1_piece_3_section:
        with BuildLine():
            CenterArc((8.650374182, -50), FILLET1_R, 90, 16.875500679)
            ThreePointArc((-5.864277791, -2.153110048), (-2.901263551, -1.160648077), (0, 0))
            Line((0, 0), (8.650374182, 0))
        make_face()
    fillet1_piece_3 = extrude(amount=70, mode=Mode.PRIVATE)
    fillet1_piece_3 = split(fillet1_piece_3, bisect_by=Plane(origin=(50, 5.13004324, 21.685248442), z_dir=(0, 1, 0)), keep=Keep.TOP, mode=Mode.PRIVATE)
    fillet1_piece_3 = split(fillet1_piece_3, bisect_by=Plane(origin=(50, 70, 26.146580326), z_dir=(0, 0, -1)), keep=Keep.TOP, mode=Mode.PRIVATE)
    fillet1_piece_3 = split(fillet1_piece_3, bisect_by=Plane(origin=(50, 16.68995568, 21.685248442), z_dir=(0, -1, 0)), keep=Keep.TOP, mode=Mode.PRIVATE)
    add(fillet1_piece_3)
    with BuildSketch(Plane(origin=(50, 70, 21.685248442), x_dir=(0, 0, 1), z_dir=(0, -1, 0))) as fillet1_piece_4_section:
        with BuildLine():
            CenterArc((8.650374182, -50), FILLET1_R, 90, 16.875500679)
            ThreePointArc((-5.864277791, -2.153110048), (-2.901263551, -1.160648077), (0, 0))
            Line((0, 0), (8.650374182, 0))
        make_face()
    fillet1_piece_4 = extrude(amount=70, mode=Mode.PRIVATE)
    fillet1_piece_4 = split(fillet1_piece_4, bisect_by=Plane(origin=(50, 5.13004324, 21.685248442), z_dir=(0, -1, 0)), keep=Keep.TOP, mode=Mode.PRIVATE)
    fillet1_piece_4 = split(fillet1_piece_4, bisect_by=Plane(origin=(50, 70, 26.146580326), z_dir=(0, 0, 1)), keep=Keep.TOP, mode=Mode.PRIVATE)
    add(fillet1_piece_4)
    with BuildSketch(Plane(origin=(50, 70, 21.685248442), x_dir=(0, 0, 1), z_dir=(0, -1, 0))) as fillet1_piece_5_section:
        with BuildLine():
            CenterArc((8.650374182, -50), FILLET1_R, 90, 16.875500679)
            ThreePointArc((-5.864277791, -2.153110048), (-2.901263551, -1.160648077), (0, 0))
            Line((0, 0), (8.650374182, 0))
        make_face()
    fillet1_piece_5 = extrude(amount=70, mode=Mode.PRIVATE)
    fillet1_piece_5 = split(fillet1_piece_5, bisect_by=Plane(origin=(50, 5.13004324, 21.685248442), z_dir=(0, -1, 0)), keep=Keep.TOP, mode=Mode.PRIVATE)
    fillet1_piece_5 = split(fillet1_piece_5, bisect_by=Plane(origin=(50, 70, 26.146580326), z_dir=(0, 0, -1)), keep=Keep.TOP, mode=Mode.PRIVATE)
    add(fillet1_piece_5)
    with BuildSketch(Plane(origin=(-50, 70, 21.685248442), x_dir=(-0.3446602732291026, 0, -0.9387274876435868), z_dir=(0, -1, 0))) as fillet1_piece_6:
        with BuildLine():
            CenterArc((9.112669638, -49.917814711), FILLET1_R, 93.285558288, 16.875500679)
            Line((-8.120344023, -2.981440329), (0, 0))
            ThreePointArc((0, 0), (3.123525128, -0.089581965), (6.247050255, 0))
        make_face()
    extrude(amount=70)

    # Fillet2
    fillet2_edges = [part_1.edges().sort_by_distance(p)[0] for p in [
        (0, 20, 97.235188276),
    ]]
    fillet(fillet2_edges, radius=FILLET2_R)

    # Fillet3
    # the kernel refuses this fillet: 20 mm, written as the material it takes off along each edge
    with BuildSketch(Plane(origin=(71.622153857, 70, 50.235188276), x_dir=(0, -0.7286276689020077, 0.6849100087678863), z_dir=(-1, 0, 0))) as fillet3_piece_1:
        with BuildLine():
            CenterArc((FILLET3_R * 0.432443077144, -FILLET3_R), FILLET3_R, 90, 46.77146974)
            Line((-FILLET3_R * 0.296184591758, -FILLET3_R * 0.315089991232), (0, 0))
            Line((0, 0), (FILLET3_R * 0.432443077144, 0))
        make_face()
    extrude(amount=143.244307714, mode=Mode.SUBTRACT)

    # Fillet4
    fillet4_edges = [part_1.edges().sort_by_distance(p)[0] for p in [
        (0, 70, -54.5),
        (-50, 70, 35.960974679),
        (50.541206557, 70, 22.998882804),
        (-50.541206557, 70, 22.998882804),
        (50, 6.037839605, 97.235188276),
        (50, 19.442799829, 95.828884352),
        (-50, 6.037839605, 97.235188276),
        (-50, 19.442799829, 95.828884352),
        (50, 70, 35.960974679),
        (50, 44.73603978, 73.983310883),
        (50, 68.357069531, 49.524714368),
        (-50, 44.73603978, 73.983310883),
        (-50, 68.357069531, 49.524714368),
    ]]
    fillet(fillet4_edges, radius=FILLET4_R)

    # Sketch27 → Cut-Extrude8 (cut)
    with BuildSketch(Plane(origin=(0, 54.482158907, 57.959743518), x_dir=(-1, 0, 0), z_dir=(0, -0.6849100087678871, -0.7286276689020071))):
        with Locations(Location((0, 0, 0), (0, 0, 90))):
            Circle(SKETCH27_R)
    extrude(amount=-CUT_EXTRUDE8_DEPTH, mode=Mode.SUBTRACT)

    # Sketch30 → Hole1 (revolve, cut)
    with BuildSketch(Plane(origin=(50, 35, 38.335622624), x_dir=(0, 0, -1), z_dir=(0, 1, 0))):
        with Locations((3, 2.5005)):
            Rectangle(SKETCH30_W, SKETCH30_H)
    revolve(axis=Axis((-60, 35, 38.335622624), (1, 0, 0)), mode=Mode.SUBTRACT)

    # Sketch36 → Boss-Extrude17 (add)
    with BuildSketch(Plane.XZ.offset(-26)):
        with Locations((46.5, 50.335248442)):
            Rectangle(SKETCH36_W, SKETCH36_H)
    extrude(amount=BOSS_EXTRUDE17_DEPTH)

    # Sketch33 → Cut-Extrude10 (cut)
    with BuildSketch(Plane(origin=(50, 0, 0), x_dir=(0, 0, -1), z_dir=(1, 0, 0))):
        with Locations((-52.635622624, 28.634494343)):
            Rectangle(SKETCH33_W, SKETCH33_H)
    extrude(amount=-CUT_EXTRUDE10_DEPTH, mode=Mode.SUBTRACT)


with BuildPart() as body_2_2:
    # Sketch26 → Boss-Extrude10 (new body)
    with BuildSketch(Plane(origin=(50, 0, 0), x_dir=(0, 0, -1), z_dir=(1, 0, 0))):
        with Locations((-78.815914384, 13)):
            Rectangle(SKETCH26_W, SKETCH26_H)
    extrude(amount=-BOSS_EXTRUDE10_DEPTH)


with BuildPart() as body_3_2:
    # Sketch31 → Boss-Extrude11 (new body)
    with BuildSketch(Plane.XZ.offset(-60)):
        with Locations(Location((0, 0, 0), (0, 0, 270))):
            Circle(SKETCH31_R)
        with Locations(Location((0, 0, 0), (0, 0, 270))):
            Circle(SKETCH31_R_2, mode=Mode.SUBTRACT)
    extrude(amount=BOSS_EXTRUDE11_DEPTH)


with BuildPart() as body_4:
    # Sketch32 → Boss-Extrude16 (new body)
    with BuildSketch(Plane.XZ.offset(-60)):
        with BuildLine():
            Line((-45, 21.794494718), (-37.675265427, 21.794494718))
            ThreePointArc((-37.675265427, 21.794494718), (0, -43.525), (37.675265427, 21.794494718))
            Line((37.675265427, 21.794494718), (45, 21.794494718))
            ThreePointArc((45, 21.794494718), (0, -50), (-45, 21.794494718))
        make_face()
    extrude(amount=BOSS_EXTRUDE16_DEPTH)


solid = Compound([part_1.part, body_2_2.part, body_3_2.part, body_4.part])
